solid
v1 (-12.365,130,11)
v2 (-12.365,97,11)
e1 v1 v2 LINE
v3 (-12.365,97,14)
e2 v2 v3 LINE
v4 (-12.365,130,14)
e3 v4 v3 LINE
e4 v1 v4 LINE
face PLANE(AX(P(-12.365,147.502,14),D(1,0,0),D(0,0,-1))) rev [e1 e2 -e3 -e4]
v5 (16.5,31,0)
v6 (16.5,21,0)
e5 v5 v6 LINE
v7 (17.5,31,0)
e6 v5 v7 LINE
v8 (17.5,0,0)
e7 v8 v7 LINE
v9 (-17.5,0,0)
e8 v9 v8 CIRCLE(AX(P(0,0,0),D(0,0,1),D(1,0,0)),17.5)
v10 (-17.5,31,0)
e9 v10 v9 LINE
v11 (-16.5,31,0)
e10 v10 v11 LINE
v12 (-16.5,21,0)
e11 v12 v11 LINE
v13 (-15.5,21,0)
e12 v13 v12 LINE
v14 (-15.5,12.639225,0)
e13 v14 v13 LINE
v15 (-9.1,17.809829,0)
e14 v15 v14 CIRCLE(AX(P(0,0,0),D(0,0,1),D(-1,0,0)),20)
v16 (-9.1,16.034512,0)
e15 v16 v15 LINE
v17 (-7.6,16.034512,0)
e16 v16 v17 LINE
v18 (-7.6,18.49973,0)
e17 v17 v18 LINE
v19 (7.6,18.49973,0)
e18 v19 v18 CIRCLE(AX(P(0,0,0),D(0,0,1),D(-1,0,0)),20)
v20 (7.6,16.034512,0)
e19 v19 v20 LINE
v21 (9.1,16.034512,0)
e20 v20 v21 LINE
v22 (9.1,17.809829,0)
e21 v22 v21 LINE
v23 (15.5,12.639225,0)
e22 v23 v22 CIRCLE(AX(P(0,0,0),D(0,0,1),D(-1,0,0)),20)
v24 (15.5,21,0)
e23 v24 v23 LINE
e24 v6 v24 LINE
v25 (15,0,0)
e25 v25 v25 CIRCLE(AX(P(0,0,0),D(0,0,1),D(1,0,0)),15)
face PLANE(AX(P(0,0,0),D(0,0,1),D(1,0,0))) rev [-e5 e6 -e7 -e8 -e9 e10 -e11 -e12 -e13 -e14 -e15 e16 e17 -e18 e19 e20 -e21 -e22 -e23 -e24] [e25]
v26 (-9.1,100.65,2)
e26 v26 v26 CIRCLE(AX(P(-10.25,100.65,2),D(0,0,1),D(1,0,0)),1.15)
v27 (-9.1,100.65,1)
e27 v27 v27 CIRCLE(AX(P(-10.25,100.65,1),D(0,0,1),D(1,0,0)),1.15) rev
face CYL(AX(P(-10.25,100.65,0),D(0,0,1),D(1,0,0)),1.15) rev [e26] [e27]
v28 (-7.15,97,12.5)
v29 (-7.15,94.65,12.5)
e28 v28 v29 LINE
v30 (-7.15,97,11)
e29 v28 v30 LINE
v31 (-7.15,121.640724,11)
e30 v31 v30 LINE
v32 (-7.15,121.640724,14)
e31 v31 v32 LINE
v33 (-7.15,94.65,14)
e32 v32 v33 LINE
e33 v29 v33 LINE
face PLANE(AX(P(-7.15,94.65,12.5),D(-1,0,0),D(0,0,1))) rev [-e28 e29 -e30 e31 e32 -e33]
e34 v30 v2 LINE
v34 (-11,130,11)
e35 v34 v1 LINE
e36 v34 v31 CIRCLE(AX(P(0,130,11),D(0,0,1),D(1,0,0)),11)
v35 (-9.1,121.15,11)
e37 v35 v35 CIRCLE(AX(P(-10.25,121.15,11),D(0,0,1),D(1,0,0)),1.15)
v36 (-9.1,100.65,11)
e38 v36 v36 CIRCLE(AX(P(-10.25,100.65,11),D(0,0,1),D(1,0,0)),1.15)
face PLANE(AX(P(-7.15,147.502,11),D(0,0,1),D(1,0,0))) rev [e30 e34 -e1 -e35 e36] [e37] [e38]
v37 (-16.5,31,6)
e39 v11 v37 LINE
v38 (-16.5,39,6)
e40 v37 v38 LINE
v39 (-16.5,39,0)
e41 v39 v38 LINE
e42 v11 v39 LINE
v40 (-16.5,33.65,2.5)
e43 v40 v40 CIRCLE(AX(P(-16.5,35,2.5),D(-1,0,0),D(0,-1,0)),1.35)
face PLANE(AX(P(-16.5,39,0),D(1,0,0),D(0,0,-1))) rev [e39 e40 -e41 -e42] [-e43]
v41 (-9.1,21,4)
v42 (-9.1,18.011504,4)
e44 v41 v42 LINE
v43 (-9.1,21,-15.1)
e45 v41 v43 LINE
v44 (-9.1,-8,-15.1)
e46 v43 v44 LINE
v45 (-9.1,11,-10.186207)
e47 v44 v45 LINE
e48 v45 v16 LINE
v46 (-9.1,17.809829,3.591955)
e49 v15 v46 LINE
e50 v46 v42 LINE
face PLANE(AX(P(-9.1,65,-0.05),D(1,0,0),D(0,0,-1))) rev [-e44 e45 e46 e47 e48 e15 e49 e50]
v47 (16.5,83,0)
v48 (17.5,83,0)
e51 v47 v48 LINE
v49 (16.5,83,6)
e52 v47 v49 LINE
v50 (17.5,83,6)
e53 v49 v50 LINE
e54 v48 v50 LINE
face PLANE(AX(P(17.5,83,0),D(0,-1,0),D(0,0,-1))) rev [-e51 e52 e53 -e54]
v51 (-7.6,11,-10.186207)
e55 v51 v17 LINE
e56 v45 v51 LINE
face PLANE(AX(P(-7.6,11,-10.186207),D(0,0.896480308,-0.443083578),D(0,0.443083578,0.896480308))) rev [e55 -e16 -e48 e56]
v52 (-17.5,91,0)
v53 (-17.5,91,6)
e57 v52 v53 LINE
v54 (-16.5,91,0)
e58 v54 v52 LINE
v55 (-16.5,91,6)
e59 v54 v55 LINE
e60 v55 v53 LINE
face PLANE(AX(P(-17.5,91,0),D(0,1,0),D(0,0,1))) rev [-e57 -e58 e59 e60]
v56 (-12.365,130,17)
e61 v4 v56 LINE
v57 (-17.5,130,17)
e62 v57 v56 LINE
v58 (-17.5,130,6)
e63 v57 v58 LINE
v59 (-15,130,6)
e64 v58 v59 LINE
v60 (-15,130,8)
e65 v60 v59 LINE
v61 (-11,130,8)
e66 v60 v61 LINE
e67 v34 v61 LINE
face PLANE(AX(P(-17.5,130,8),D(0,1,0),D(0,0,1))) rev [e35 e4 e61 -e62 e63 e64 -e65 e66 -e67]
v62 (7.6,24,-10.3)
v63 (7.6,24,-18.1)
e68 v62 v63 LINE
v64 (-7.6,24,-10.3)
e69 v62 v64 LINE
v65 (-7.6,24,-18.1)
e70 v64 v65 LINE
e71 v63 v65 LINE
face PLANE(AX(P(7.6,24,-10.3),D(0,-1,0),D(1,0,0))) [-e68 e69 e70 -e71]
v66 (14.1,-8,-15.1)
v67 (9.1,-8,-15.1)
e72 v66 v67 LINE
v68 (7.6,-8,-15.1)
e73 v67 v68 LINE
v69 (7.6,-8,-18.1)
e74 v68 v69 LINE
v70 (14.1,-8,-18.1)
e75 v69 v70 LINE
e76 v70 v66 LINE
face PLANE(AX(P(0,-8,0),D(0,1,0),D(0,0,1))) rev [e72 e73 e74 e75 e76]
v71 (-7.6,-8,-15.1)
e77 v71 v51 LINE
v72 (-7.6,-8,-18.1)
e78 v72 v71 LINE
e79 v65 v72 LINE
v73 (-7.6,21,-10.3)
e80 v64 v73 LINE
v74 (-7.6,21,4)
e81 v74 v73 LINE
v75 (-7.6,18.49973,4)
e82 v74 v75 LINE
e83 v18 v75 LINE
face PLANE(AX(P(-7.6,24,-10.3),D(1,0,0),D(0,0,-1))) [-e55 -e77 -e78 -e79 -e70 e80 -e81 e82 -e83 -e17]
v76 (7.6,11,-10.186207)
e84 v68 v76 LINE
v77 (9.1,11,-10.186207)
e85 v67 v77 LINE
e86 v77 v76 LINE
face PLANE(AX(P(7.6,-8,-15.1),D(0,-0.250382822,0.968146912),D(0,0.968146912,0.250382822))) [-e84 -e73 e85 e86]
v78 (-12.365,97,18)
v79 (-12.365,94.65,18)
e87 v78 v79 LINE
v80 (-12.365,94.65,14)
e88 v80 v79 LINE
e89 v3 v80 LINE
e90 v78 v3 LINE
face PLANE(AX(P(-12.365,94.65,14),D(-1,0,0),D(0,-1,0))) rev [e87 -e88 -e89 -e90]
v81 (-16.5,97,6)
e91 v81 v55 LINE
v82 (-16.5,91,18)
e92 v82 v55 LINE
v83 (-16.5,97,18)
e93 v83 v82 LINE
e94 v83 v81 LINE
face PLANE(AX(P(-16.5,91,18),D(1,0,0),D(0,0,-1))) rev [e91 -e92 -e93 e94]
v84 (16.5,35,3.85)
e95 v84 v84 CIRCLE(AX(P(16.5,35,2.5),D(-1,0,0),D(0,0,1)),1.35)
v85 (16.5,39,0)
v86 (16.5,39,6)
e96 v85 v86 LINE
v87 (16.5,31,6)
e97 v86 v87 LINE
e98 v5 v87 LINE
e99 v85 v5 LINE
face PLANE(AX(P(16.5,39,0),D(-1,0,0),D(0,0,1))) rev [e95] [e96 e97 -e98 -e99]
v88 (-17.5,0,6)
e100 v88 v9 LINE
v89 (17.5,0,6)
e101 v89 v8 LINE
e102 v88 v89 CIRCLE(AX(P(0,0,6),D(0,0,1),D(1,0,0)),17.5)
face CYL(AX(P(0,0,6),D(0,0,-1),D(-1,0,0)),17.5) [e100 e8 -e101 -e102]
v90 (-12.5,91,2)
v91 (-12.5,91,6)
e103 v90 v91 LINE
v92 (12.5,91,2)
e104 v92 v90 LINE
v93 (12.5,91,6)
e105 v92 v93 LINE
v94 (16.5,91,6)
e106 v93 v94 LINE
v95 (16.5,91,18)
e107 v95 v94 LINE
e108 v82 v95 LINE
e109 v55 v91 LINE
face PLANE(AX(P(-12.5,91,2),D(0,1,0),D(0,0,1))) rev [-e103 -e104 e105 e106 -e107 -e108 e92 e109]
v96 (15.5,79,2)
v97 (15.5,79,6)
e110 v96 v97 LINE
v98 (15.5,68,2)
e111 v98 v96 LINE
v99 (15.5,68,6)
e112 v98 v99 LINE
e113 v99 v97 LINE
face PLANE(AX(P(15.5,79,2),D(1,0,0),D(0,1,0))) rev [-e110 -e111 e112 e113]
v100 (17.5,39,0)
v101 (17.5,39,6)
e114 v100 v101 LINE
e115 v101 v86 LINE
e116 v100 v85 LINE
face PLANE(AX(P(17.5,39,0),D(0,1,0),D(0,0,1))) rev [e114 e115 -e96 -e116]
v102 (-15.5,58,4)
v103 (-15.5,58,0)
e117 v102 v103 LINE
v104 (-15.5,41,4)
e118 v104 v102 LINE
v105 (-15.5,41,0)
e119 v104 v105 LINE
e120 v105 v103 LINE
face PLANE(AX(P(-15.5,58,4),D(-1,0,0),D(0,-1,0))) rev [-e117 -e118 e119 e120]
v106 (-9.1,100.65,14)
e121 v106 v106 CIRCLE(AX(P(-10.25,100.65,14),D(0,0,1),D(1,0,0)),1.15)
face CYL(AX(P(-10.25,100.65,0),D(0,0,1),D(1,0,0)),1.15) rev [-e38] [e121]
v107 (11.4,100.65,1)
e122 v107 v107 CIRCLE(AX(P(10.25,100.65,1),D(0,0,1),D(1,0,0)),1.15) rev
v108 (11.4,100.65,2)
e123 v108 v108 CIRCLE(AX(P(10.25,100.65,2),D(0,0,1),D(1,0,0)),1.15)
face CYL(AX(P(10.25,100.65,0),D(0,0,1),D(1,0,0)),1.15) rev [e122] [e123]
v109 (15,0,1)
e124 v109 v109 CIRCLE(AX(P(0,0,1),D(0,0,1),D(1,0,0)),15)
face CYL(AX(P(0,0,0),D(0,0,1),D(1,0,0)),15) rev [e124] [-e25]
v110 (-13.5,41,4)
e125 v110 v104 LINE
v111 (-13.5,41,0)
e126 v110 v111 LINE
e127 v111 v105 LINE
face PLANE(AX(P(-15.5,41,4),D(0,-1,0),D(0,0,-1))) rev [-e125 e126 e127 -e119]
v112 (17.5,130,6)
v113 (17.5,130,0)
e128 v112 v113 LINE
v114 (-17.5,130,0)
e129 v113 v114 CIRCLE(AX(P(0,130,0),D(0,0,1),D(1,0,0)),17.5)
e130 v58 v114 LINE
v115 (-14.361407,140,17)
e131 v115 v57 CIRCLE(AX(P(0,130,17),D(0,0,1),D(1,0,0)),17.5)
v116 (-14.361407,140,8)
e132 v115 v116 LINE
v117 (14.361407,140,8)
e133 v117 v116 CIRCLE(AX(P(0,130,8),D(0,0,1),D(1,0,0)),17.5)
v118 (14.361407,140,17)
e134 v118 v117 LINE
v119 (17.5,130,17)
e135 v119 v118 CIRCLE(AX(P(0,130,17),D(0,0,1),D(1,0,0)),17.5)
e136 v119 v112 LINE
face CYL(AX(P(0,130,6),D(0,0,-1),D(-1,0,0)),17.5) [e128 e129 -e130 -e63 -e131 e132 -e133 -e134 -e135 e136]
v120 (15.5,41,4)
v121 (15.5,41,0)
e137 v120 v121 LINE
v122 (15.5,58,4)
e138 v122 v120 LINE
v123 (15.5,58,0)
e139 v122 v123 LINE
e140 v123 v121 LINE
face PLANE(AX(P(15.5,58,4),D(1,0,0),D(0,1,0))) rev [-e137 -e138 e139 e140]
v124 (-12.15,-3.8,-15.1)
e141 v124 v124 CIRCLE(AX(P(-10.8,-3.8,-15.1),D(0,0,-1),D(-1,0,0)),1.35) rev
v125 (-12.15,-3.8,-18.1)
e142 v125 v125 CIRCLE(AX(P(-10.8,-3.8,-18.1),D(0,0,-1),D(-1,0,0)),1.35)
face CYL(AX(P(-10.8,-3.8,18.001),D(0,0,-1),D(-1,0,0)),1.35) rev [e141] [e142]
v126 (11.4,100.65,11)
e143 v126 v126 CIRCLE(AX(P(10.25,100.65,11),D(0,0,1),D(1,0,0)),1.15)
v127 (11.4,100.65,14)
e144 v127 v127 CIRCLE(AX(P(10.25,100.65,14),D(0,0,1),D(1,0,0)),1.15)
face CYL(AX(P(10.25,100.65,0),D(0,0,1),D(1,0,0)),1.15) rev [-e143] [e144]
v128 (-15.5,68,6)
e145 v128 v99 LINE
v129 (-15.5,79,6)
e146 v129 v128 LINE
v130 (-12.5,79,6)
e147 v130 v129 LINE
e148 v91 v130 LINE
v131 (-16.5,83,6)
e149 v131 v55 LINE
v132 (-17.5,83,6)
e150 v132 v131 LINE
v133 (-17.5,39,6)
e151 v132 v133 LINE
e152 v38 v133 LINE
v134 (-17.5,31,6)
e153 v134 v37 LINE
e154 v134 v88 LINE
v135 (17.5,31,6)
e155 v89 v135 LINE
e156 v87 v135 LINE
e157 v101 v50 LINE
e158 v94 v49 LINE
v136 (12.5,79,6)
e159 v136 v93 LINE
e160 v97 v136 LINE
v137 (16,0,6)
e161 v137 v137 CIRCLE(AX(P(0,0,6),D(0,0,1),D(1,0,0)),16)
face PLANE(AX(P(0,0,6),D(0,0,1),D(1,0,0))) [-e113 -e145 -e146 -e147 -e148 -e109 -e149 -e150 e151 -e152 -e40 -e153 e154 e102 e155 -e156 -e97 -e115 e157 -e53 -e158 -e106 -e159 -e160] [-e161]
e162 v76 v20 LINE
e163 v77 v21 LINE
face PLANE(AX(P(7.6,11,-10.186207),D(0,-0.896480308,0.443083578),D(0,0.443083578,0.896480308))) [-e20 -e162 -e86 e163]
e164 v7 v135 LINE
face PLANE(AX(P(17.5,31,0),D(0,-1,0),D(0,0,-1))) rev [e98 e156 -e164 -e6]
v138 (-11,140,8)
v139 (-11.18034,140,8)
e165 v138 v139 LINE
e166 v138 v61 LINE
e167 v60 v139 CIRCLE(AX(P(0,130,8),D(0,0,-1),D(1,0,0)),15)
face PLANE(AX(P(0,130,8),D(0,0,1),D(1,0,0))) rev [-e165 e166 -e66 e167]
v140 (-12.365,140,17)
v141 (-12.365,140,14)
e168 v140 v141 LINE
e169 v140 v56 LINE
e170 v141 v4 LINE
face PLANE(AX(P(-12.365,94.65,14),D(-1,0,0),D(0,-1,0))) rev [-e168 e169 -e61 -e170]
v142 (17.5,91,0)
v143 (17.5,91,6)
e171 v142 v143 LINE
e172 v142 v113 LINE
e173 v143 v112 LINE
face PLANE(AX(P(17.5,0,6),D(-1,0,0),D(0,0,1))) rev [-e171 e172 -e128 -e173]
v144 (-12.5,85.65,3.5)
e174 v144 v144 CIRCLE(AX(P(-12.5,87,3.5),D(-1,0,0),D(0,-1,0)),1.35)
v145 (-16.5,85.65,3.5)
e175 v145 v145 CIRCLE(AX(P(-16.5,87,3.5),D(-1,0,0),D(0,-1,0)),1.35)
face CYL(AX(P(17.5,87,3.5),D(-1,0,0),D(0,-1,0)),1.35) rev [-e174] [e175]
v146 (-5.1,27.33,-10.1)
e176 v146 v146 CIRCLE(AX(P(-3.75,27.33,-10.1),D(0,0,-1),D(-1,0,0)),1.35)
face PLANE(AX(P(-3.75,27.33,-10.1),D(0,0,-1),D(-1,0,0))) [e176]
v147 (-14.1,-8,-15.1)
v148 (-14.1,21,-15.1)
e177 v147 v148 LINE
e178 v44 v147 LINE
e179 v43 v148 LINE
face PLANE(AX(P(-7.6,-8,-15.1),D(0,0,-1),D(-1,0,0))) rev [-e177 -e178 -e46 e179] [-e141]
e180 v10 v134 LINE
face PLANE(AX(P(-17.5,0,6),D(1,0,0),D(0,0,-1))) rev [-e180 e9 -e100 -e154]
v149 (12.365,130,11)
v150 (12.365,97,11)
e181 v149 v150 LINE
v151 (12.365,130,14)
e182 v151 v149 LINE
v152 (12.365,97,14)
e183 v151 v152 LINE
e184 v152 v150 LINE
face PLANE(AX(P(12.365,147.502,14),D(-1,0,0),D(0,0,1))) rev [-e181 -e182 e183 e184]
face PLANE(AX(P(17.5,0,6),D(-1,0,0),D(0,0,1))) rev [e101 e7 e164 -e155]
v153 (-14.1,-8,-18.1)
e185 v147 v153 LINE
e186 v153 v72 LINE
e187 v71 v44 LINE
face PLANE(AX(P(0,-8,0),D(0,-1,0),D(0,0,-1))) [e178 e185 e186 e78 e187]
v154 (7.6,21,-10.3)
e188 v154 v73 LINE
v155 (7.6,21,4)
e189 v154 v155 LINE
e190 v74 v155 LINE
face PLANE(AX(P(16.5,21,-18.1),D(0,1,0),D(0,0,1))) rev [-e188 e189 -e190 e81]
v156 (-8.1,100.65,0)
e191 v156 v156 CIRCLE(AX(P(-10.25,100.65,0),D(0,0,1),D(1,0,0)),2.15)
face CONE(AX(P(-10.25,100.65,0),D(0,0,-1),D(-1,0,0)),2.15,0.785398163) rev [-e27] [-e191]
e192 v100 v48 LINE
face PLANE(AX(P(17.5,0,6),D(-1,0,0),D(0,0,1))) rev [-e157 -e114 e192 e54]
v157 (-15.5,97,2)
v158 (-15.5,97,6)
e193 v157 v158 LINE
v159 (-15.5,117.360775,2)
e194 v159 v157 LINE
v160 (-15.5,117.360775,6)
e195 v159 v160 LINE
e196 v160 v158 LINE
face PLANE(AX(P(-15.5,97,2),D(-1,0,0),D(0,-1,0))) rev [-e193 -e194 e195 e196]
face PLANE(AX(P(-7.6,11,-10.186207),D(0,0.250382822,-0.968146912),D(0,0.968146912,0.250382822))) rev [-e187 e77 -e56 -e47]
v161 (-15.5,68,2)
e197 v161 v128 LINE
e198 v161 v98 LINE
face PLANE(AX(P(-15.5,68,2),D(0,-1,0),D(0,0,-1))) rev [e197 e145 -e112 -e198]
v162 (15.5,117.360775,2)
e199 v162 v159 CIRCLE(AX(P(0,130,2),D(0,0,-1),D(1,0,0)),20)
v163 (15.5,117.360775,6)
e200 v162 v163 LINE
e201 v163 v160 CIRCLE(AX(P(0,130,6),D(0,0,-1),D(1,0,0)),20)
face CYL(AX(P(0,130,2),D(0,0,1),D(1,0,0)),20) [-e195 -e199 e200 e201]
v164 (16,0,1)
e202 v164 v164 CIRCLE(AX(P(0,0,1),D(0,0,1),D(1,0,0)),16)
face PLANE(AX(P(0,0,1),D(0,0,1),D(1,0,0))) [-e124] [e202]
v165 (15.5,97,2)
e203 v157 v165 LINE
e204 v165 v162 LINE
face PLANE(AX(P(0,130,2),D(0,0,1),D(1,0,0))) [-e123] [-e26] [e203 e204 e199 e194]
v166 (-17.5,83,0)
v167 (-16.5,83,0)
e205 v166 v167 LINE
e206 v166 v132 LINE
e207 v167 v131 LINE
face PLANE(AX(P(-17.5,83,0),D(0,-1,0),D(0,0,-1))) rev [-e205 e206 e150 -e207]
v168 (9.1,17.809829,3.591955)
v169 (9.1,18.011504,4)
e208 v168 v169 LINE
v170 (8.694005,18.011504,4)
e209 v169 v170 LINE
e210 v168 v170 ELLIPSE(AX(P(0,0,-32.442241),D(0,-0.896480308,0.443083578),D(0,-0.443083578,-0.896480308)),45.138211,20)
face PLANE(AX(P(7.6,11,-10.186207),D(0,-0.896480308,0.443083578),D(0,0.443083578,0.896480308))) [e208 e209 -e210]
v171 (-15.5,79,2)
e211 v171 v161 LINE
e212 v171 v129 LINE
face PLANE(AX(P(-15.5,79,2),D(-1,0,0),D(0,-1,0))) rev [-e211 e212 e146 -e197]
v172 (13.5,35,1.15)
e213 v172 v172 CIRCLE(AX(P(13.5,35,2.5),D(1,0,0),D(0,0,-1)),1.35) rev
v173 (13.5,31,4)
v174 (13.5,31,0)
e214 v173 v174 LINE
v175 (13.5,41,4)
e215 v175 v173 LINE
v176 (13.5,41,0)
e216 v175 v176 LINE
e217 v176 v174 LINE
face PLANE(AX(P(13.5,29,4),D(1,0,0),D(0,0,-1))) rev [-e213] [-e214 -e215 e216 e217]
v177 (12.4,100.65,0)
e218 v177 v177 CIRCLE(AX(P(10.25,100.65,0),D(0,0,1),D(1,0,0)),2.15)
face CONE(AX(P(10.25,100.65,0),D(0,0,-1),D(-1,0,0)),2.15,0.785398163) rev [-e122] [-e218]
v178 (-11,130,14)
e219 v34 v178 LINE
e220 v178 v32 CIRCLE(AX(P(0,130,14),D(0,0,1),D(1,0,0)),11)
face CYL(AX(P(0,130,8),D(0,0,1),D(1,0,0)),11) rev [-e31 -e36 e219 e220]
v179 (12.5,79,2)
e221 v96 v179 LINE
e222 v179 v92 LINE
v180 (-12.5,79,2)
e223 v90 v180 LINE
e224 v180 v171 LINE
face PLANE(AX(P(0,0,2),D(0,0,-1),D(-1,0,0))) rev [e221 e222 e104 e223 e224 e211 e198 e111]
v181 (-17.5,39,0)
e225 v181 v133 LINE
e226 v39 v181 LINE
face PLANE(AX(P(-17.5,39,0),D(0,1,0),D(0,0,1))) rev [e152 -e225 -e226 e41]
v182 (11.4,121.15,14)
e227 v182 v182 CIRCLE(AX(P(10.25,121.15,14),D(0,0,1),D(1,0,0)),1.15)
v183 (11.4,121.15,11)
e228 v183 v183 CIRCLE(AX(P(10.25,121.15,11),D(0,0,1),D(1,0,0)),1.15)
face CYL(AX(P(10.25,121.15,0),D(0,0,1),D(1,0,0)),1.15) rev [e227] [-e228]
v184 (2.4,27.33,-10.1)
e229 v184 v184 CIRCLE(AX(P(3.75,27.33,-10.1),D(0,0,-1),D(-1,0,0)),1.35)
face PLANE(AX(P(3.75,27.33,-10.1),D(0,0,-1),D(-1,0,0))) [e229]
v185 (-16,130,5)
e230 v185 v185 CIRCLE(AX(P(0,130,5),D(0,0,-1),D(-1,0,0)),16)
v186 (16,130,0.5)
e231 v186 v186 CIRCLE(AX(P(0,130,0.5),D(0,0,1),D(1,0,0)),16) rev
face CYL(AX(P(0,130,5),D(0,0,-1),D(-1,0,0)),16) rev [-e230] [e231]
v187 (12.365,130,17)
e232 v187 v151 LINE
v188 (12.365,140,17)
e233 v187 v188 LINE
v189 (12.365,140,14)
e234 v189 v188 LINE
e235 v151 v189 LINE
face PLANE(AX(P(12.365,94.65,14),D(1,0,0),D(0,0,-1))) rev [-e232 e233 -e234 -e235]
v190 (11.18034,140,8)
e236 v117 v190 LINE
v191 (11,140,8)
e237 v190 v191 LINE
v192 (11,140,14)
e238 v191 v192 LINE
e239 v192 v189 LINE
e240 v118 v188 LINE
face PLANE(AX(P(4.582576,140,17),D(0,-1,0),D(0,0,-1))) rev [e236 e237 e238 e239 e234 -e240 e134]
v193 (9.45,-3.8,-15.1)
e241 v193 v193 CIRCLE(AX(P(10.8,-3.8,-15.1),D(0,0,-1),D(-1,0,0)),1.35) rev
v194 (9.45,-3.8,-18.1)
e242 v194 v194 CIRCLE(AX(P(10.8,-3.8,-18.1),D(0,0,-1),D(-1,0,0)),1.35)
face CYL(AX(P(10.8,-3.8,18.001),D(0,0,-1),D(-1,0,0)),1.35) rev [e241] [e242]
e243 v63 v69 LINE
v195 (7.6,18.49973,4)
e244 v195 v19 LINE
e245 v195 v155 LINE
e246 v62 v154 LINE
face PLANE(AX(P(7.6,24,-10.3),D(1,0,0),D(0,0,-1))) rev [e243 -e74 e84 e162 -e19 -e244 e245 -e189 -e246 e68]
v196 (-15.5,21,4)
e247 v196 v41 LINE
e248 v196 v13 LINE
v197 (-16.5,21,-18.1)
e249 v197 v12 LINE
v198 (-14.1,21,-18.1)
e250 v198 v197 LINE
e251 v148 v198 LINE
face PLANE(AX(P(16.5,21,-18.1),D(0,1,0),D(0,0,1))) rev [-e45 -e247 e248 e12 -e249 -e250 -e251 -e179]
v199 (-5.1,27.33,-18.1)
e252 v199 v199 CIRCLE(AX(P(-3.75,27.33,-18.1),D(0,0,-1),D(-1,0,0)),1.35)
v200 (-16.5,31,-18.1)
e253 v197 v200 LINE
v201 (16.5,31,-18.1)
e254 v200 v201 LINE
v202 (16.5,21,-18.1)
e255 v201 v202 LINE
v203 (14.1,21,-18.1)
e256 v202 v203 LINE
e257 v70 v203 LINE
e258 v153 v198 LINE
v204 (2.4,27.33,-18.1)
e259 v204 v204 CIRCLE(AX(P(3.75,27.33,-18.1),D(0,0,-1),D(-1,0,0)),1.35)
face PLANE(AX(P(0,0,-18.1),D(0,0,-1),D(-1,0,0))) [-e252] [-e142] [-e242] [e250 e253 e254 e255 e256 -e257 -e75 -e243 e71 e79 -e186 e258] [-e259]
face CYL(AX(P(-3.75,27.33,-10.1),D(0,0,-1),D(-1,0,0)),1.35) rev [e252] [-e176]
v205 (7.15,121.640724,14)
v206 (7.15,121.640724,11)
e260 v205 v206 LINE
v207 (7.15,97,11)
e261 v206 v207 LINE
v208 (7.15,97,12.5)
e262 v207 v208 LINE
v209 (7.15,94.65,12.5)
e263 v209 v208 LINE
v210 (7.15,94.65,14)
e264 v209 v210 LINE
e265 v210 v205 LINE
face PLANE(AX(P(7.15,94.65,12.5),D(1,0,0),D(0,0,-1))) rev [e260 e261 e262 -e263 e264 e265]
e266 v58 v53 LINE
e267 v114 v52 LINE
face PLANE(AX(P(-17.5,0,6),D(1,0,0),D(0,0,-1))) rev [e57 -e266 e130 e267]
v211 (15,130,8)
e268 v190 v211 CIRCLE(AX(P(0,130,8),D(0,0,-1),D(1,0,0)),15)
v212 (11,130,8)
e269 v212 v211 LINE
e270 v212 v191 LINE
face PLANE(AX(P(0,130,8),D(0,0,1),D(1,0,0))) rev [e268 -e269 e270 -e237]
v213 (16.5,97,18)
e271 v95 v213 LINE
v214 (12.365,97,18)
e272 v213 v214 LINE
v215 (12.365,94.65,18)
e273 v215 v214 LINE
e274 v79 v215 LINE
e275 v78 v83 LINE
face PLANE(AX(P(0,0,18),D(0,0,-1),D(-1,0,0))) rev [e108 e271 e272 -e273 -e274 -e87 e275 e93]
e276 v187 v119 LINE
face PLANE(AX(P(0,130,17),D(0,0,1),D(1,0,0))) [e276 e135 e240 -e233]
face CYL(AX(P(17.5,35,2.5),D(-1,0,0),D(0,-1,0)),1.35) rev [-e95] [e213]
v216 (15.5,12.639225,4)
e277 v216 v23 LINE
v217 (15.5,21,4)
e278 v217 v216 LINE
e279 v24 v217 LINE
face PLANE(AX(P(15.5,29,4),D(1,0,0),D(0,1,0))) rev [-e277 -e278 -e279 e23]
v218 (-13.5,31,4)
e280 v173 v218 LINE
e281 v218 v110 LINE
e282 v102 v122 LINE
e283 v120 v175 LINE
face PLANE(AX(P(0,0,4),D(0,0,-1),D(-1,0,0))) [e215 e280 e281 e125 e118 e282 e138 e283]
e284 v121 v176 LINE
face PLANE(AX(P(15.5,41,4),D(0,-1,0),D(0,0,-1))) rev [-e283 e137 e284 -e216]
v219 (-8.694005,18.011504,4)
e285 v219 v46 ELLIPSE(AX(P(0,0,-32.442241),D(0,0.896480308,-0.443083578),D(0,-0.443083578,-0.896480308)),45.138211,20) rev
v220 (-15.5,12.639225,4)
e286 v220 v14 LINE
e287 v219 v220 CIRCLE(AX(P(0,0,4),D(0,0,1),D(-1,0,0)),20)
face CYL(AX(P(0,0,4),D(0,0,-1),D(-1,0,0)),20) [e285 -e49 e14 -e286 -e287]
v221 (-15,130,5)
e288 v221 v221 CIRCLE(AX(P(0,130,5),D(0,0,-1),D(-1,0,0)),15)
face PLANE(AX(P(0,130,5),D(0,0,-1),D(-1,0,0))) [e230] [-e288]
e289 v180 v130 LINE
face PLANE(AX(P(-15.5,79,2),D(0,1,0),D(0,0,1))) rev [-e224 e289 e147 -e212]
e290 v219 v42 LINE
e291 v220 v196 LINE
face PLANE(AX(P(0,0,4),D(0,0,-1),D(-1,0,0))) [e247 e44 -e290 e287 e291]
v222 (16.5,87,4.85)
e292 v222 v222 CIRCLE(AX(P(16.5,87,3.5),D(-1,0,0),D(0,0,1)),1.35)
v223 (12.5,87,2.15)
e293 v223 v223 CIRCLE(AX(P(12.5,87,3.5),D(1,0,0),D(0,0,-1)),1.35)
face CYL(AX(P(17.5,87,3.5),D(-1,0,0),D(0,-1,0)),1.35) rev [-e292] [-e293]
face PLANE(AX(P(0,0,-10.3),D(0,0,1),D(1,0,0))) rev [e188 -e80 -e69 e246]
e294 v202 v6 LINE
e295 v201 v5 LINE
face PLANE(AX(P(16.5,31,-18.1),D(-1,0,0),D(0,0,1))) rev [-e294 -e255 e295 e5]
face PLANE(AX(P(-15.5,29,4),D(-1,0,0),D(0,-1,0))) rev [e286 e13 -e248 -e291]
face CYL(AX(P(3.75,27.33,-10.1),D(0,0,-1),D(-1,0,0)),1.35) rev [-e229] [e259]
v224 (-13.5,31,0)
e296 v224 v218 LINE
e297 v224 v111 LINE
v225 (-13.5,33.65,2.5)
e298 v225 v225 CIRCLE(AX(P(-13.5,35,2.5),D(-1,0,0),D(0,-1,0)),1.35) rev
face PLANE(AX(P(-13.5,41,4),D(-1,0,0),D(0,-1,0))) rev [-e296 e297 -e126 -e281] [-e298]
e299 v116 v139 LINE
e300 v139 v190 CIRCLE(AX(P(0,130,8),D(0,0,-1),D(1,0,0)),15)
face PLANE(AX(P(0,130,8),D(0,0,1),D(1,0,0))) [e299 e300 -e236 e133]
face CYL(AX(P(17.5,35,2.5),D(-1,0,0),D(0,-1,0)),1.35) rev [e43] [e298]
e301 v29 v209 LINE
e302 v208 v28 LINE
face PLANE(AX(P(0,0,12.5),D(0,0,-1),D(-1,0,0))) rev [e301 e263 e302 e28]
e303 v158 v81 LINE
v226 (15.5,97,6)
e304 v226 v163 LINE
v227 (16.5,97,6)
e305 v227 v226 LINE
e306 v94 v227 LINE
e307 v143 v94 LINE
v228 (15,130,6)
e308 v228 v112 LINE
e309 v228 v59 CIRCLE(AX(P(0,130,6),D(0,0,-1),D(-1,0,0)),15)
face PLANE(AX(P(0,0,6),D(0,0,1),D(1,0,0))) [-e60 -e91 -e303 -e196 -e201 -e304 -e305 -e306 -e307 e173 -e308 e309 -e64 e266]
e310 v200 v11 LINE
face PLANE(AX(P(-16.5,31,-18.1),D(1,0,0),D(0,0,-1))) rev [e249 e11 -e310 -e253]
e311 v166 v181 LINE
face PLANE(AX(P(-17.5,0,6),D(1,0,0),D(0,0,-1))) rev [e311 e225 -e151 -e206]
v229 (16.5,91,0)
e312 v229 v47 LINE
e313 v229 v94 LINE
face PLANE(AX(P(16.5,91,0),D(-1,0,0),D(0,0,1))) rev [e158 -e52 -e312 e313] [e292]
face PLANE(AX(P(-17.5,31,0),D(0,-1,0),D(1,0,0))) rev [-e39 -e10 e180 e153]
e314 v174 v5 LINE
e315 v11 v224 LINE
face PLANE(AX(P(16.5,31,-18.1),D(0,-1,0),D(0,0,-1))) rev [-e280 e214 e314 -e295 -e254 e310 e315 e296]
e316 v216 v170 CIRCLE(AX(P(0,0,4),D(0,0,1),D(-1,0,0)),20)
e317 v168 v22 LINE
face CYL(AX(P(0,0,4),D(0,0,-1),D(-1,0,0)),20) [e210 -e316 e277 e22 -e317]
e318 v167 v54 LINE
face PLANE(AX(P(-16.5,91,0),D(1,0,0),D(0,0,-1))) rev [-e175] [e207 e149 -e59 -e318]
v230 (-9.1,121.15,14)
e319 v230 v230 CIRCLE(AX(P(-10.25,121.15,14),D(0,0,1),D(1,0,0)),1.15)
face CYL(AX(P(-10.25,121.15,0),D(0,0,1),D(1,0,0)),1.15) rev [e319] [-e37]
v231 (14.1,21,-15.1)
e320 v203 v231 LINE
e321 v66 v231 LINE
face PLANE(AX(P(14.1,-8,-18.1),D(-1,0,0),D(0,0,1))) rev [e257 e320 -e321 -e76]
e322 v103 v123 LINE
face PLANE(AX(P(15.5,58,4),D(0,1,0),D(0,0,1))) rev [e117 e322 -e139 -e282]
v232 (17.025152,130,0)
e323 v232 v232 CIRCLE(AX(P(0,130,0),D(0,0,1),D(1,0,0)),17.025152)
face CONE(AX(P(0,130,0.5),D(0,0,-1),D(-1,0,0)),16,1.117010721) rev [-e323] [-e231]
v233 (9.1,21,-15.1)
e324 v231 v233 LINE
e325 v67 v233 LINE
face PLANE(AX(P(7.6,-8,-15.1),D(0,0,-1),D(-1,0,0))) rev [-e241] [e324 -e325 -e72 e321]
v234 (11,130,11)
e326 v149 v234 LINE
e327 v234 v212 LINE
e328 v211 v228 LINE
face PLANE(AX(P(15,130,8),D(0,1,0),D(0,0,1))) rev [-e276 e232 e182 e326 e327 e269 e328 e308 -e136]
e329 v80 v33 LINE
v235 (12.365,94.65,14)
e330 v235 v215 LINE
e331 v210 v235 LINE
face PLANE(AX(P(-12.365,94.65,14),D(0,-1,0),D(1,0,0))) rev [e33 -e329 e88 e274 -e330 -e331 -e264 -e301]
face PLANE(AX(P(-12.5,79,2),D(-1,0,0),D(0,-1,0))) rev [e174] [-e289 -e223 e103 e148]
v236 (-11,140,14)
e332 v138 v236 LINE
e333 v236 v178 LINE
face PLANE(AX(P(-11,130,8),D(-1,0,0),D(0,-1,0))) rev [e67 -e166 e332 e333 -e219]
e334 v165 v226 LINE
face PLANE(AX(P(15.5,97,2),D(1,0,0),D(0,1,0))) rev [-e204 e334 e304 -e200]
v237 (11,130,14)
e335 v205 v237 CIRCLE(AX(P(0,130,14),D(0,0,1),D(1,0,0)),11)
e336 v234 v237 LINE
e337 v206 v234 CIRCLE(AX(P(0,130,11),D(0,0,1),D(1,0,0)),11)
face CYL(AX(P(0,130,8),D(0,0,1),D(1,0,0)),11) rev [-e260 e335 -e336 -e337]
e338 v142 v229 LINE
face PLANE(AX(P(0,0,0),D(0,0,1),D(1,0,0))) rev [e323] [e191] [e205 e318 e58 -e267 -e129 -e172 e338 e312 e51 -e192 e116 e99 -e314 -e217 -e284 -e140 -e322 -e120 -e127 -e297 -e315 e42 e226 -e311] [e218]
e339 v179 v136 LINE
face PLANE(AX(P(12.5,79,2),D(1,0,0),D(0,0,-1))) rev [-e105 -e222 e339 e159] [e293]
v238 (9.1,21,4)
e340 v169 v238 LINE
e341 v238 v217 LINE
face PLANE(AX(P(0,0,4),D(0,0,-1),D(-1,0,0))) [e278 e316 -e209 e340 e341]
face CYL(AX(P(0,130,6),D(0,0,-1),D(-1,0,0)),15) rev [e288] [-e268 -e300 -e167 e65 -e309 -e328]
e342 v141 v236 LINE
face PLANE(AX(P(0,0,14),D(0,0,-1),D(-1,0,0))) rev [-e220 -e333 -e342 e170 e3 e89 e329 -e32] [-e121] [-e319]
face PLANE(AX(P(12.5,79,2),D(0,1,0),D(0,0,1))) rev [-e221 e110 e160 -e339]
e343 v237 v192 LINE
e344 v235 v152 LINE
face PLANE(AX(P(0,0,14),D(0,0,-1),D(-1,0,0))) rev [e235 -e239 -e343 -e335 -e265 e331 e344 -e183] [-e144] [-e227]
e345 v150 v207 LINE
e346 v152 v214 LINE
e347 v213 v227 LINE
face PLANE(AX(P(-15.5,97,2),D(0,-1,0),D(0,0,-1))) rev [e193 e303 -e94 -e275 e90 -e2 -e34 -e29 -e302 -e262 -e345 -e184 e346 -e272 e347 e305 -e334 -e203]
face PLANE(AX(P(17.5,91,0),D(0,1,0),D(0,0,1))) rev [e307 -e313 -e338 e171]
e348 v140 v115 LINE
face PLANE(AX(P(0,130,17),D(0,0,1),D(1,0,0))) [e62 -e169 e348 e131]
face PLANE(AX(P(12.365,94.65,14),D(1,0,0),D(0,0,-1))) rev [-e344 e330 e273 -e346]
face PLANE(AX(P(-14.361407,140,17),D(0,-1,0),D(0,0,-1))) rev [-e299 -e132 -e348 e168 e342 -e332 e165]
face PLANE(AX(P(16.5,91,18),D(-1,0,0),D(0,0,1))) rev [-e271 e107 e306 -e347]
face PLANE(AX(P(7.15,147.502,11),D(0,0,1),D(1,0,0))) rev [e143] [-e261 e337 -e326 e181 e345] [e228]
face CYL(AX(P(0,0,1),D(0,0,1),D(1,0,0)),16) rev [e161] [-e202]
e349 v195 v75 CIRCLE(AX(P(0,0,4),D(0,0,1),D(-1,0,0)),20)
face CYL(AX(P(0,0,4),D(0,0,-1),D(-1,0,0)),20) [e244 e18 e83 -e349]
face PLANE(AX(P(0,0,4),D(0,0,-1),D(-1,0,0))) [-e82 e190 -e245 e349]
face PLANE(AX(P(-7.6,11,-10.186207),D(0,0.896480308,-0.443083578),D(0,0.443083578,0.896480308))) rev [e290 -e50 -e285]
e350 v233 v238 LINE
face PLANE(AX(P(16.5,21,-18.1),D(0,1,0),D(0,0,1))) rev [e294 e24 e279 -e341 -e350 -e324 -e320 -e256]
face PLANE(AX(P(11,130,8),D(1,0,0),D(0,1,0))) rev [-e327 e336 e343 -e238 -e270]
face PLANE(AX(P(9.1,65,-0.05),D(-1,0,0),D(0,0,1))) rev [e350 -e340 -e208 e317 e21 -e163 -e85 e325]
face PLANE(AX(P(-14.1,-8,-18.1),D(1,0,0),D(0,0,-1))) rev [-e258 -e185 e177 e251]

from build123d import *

# Parameters (mm, degrees)
EXTRUDE_1_DEPTH      = 6
SKETCH_2_R           = 16
CUT_EXTRUDE_1_DEPTH  = 5
CHAMFER_1_SIZE       = 0.5
CHAMFER_1_SIZE2      = 1.025151921
SKETCH_24_R          = 15
CUT_EXTRUDE_15_DEPTH = 149.618639477
CUT_EXTRUDE_16_DEPTH = 4
SKETCH_26_W          = 1
SKETCH_26_H          = 8
CUT_EXTRUDE_17_DEPTH = 149.655642342
SKETCH_27_R          = 1.35
CUT_EXTRUDE_18_DEPTH = 152.486798105
SKETCH_29_W          = 33
SKETCH_29_H          = 6
EXTRUDE_3_DEPTH      = 12
EXTRUDE_4_DEPTH      = 2
EXTRUDE_5_DEPTH      = 9
SKETCH_32_W          = 24.73
SKETCH_32_H          = 50
CUT_EXTRUDE_19_DEPTH = 4
SKETCH_33_W          = 14.3
SKETCH_33_H          = 2.35
CUT_EXTRUDE_20_DEPTH = 1.5
EXTRUDE_6_REACH      = 119.22
SKETCH_34_W          = 5.215
SKETCH_34_H          = 3
CUT_EXTRUDE_START    = -6
CUT_EXTRUDE_21_DEPTH = 6
SKETCH_36_R          = 1.15
CUT_EXTRUDE_22_DEPTH = 150.192828246
SKETCH_37_R          = 16
CUT_EXTRUDE_23_DEPTH = 5
SKETCH_38_R          = 15
CUT_EXTRUDE_24_DEPTH = 150.504180544
CUT_EXTRUDE_25_DEPTH = 4
SKETCH_40_W          = 33
SKETCH_40_H          = 10
EXTRUDE_7_DEPTH      = 22.1
SKETCH_41_W          = 15.2
SKETCH_41_H          = 3
CUT_EXTRUDE_26_DEPTH = 7.8
SKETCH_42_R          = 1.35
CUT_EXTRUDE_27_DEPTH = 8
SKETCH_43_W          = 6.5
SKETCH_43_H          = 3
EXTRUDE_8_DEPTH      = 29
CUT_EXTRUDE_28_REACH = 154.858
SKETCH_48_R          = 1.35
RIB_START            = -1.5
RIB_17_DEPTH         = 1.5
RIB_20_DEPTH         = 1.5
CHAMFER_2_SIZE       = 1


# Read off the part's stored shape, not the designer's step: 보강대17, 보강대20
with BuildPart() as part:
    # 스케치1 → 보스-돌출1 (new body)
    with BuildSketch(Plane.XY):
        with BuildLine():
            Line((-17.5, 0), (-17.5, 130))
            ThreePointArc((-17.5, 130), (0, 147.5), (17.5, 130))
            Line((17.5, 130), (17.5, 0))
            ThreePointArc((17.5, 0), (0, -17.5), (-17.5, 0))
        make_face()
    extrude(amount=EXTRUDE_1_DEPTH)

    # 스케치2 → 컷-돌출1 (cut)
    with BuildSketch(Plane(origin=(0, 0, 0), x_dir=(-1, 0, 0), z_dir=(0, 0, -1))):
        with Locations((0, 130)):
            Circle(SKETCH_2_R)
    extrude(amount=-CUT_EXTRUDE_1_DEPTH, mode=Mode.SUBTRACT)

    # 모따기1
    chamfer_1_edges = [part.edges().sort_by_distance(p)[0] for p in [
        (16, 130, 0),
    ]]
    chamfer_1_side = [part.faces().sort_by_distance(p)[0] for p in [
        (16, 130, 2.5),
    ]]
    chamfer(chamfer_1_edges, length=CHAMFER_1_SIZE, length2=CHAMFER_1_SIZE2, reference=chamfer_1_side[0])

    # 스케치24 → 컷-돌출15 (cut, through all)
    with BuildSketch(Plane(origin=(0, 0, 5), x_dir=(-1, 0, 0), z_dir=(0, 0, -1))):
        with Locations((0, 130)):
            Circle(SKETCH_24_R)
    extrude(amount=-CUT_EXTRUDE_15_DEPTH, mode=Mode.SUBTRACT)

    # 스케치25 → 컷-돌출16 (cut)
    with BuildSketch(Plane.XY.offset(6)):
        with BuildLine():
            Line((-15.5, 97), (15.5, 97))
            Line((15.5, 97), (15.5, 117.36077534))
            ThreePointArc((15.5, 117.36077534), (0, 110), (-15.5, 117.36077534))
            Line((-15.5, 117.36077534), (-15.5, 97))
        make_face()
        Polygon((-15.5, 79), (-12.5, 79), (-12.5, 91), (12.5, 91), (12.5, 79), (15.5, 79), (15.5, 68), (-15.5, 68), align=None)
    extrude(amount=-CUT_EXTRUDE_16_DEPTH, mode=Mode.SUBTRACT)

    # 스케치26 → 컷-돌출17 (cut, through all)
    with BuildSketch(Plane.XY.offset(6)):
        with Locations((-17, 87)):
            Rectangle(SKETCH_26_W, SKETCH_26_H)
        with Locations((17, 87)):
            Rectangle(SKETCH_26_W, SKETCH_26_H)
        with Locations((-17, 35)):
            Rectangle(SKETCH_26_W, SKETCH_26_H)
        with Locations((17, 35)):
            Rectangle(SKETCH_26_W, SKETCH_26_H)
    extrude(amount=-CUT_EXTRUDE_17_DEPTH, mode=Mode.SUBTRACT)

    # 스케치27 → 컷-돌출18 (cut, through all)
    with BuildSketch(Plane.ZY.offset(16.5)):
        with Locations((3.5, 87)):
            Circle(SKETCH_27_R)
        with Locations(Location((2.5, 35, 0), (0, 0, 270))):
            Circle(SKETCH_27_R)
    extrude(amount=-CUT_EXTRUDE_18_DEPTH, mode=Mode.SUBTRACT)

    # 스케치29 → 보스-돌출3 (add)
    with BuildSketch(Plane.XY.offset(6)):
        with Locations((0, 94)):
            Rectangle(SKETCH_29_W, SKETCH_29_H)
    extrude(amount=EXTRUDE_3_DEPTH)

    # 스케치30 → 보스-돌출4 (add)
    with BuildSketch(Plane.XY.offset(6)):
        with BuildLine():
            Line((-17.5, 130), (-15, 130))
            ThreePointArc((-15, 130), (0, 145), (15, 130))
            Line((15, 130), (17.5, 130))
            ThreePointArc((17.5, 130), (0, 147.5), (-17.5, 130))
        make_face()
    extrude(amount=EXTRUDE_4_DEPTH)

    # 스케치31 → 보스-돌출5 (add)
    with BuildSketch(Plane.XY.offset(8)):
        with BuildLine():
            Line((-17.5, 130), (-11, 130))
            ThreePointArc((-11, 130), (-9.257654472, 135.941029682), (-4.582575695, 140))
            Line((-4.582575695, 140), (-14.361406616, 140))
            ThreePointArc((-14.361406616, 140), (-16.696925103, 135.240485866), (-17.5, 130))
        make_face()
        with BuildLine():
            Line((11, 130), (17.5, 130))
            ThreePointArc((17.5, 130), (16.696925103, 135.240485866), (14.361406616, 140))
            Line((14.361406616, 140), (4.582575695, 140))
            ThreePointArc((4.582575695, 140), (9.257654472, 135.941029682), (11, 130))
        make_face()
    extrude(amount=EXTRUDE_5_DEPTH)

    # 스케치32 → 컷-돌출19 (cut)
    with BuildSketch(Plane.XY.offset(18)):
        with Locations((0, 119.65)):
            Rectangle(SKETCH_32_W, SKETCH_32_H)
    extrude(amount=-CUT_EXTRUDE_19_DEPTH, mode=Mode.SUBTRACT)

    # 스케치33 → 컷-돌출20 (cut)
    with BuildSketch(Plane.XY.offset(14)):
        with Locations((0, 95.825)):
            Rectangle(SKETCH_33_W, SKETCH_33_H)
    extrude(amount=-CUT_EXTRUDE_20_DEPTH, mode=Mode.SUBTRACT)

    # 스케치34 → 보스-돌출6 (add, up to next)
    with BuildSketch(Plane(origin=(0, 97, 0), x_dir=(1, 0, 0), z_dir=(0, 1, 0)), mode=Mode.PRIVATE) as extrude_6_sk1:
        with Locations((-9.7575, -12.5)):
            Rectangle(SKETCH_34_W, SKETCH_34_H)
    extrude_6_tool1 = extrude(extrude_6_sk1.sketch, amount=EXTRUDE_6_REACH, mode=Mode.PRIVATE) - part.part
    # 스케치34 → 보스-돌출6 (add, up to next)
    with BuildSketch(Plane(origin=(0, 97, 0), x_dir=(1, 0, 0), z_dir=(0, 1, 0)), mode=Mode.PRIVATE) as extrude_6_sk2:
        with Locations((9.7575, -12.5)):
            Rectangle(SKETCH_34_W, SKETCH_34_H)
    extrude_6_tool2 = extrude(extrude_6_sk2.sketch, amount=EXTRUDE_6_REACH, mode=Mode.PRIVATE) - part.part
    add(extrude_6_tool1.solids().sort_by_distance((-9.7575, 97, 12.5))[0])
    add(extrude_6_tool2.solids().sort_by_distance((9.7575, 97, 12.5))[0])

    # 스케치35 → 컷-돌출21 (cut)
    with BuildSketch(Plane.XY.offset(14).offset(CUT_EXTRUDE_START)):
        with BuildLine():
            Line((-11, 130), (-11, 140))
            Line((-11, 140), (11, 140))
            Line((11, 140), (11, 130))
            ThreePointArc((11, 130), (0, 119), (-11, 130))
        make_face()
    extrude(amount=CUT_EXTRUDE_21_DEPTH, mode=Mode.SUBTRACT)

    # 스케치36 → 컷-돌출22 (cut, through all)
    with BuildSketch(Plane.XY.offset(14)):
        with Locations((-10.25, 121.15)):
            Circle(SKETCH_36_R)
        with Locations((10.25, 121.15)):
            Circle(SKETCH_36_R)
        with Locations((-10.25, 100.65)):
            Circle(SKETCH_36_R)
        with Locations((10.25, 100.65)):
            Circle(SKETCH_36_R)
    extrude(amount=-CUT_EXTRUDE_22_DEPTH, mode=Mode.SUBTRACT)

    # 스케치37 → 컷-돌출23 (cut)
    with BuildSketch(Plane.XY.offset(6)):
        Circle(SKETCH_37_R)
    extrude(amount=-CUT_EXTRUDE_23_DEPTH, mode=Mode.SUBTRACT)

    # 스케치38 → 컷-돌출24 (cut, through all)
    with BuildSketch(Plane.XY.offset(1)):
        Circle(SKETCH_38_R)
    extrude(amount=-CUT_EXTRUDE_24_DEPTH, mode=Mode.SUBTRACT)

    # 스케치39 → 컷-돌출25 (cut)
    with BuildSketch(Plane(origin=(0, 0, 0), x_dir=(-1, 0, 0), z_dir=(0, 0, -1))):
        with BuildLine():
            Line((-15.5, 58), (-15.5, 41))
            Line((-15.5, 41), (-13.5, 41))
            Line((-13.5, 41), (-13.5, 29))
            Line((-13.5, 29), (-15.5, 29))
            Line((-15.5, 29), (-15.5, 12.63922466))
            ThreePointArc((-15.5, 12.63922466), (0, 20), (15.5, 12.63922466))
            Line((15.5, 12.63922466), (15.5, 29))
            Line((15.5, 29), (13.5, 29))
            Line((13.5, 29), (13.5, 41))
            Line((13.5, 41), (15.5, 41))
            Line((15.5, 41), (15.5, 58))
            Line((15.5, 58), (-15.5, 58))
        make_face()
    extrude(amount=-CUT_EXTRUDE_25_DEPTH, mode=Mode.SUBTRACT)

    # 스케치40 → 보스-돌출7 (add)
    with BuildSketch(Plane(origin=(0, 0, 4), x_dir=(-1, 0, 0), z_dir=(0, 0, -1))):
        with Locations((0, 26)):
            Rectangle(SKETCH_40_W, SKETCH_40_H)
    extrude(amount=EXTRUDE_7_DEPTH)

    # 스케치41 → 컷-돌출26 (cut)
    with BuildSketch(Plane(origin=(0, 0, -18.1), x_dir=(-1, 0, 0), z_dir=(0, 0, -1))):
        with Locations((0, 22.5)):
            Rectangle(SKETCH_41_W, SKETCH_41_H)
    extrude(amount=-CUT_EXTRUDE_26_DEPTH, mode=Mode.SUBTRACT)

    # 스케치42 → 컷-돌출27 (cut)
    with BuildSketch(Plane(origin=(0, 0, -18.1), x_dir=(-1, 0, 0), z_dir=(0, 0, -1))):
        with Locations((-3.75, 27.33)):
            Circle(SKETCH_42_R)
        with Locations((3.75, 27.33)):
            Circle(SKETCH_42_R)
    extrude(amount=-CUT_EXTRUDE_27_DEPTH, mode=Mode.SUBTRACT)

    # 스케치43 → 보스-돌출8 (add)
    with BuildSketch(Plane.XZ.offset(-21)):
        with Locations((-10.85, -16.6)):
            Rectangle(SKETCH_43_W, SKETCH_43_H)
        with Locations((10.85, -16.6)):
            Rectangle(SKETCH_43_W, SKETCH_43_H)
    extrude(amount=EXTRUDE_8_DEPTH)

    # 스케치48 → 컷-돌출28 (cut, up to next)
    with BuildSketch(Plane(origin=(0, 0, -18.1), x_dir=(-1, 0, 0), z_dir=(0, 0, -1)), mode=Mode.PRIVATE) as cut_extrude_28_sk1:
        with Locations((10.8, -3.8)):
            Circle(SKETCH_48_R)
    cut_extrude_28_tool1 = extrude(cut_extrude_28_sk1.sketch, amount=-CUT_EXTRUDE_28_REACH, mode=Mode.PRIVATE) & part.part
    # 스케치48 → 컷-돌출28 (cut, up to next)
    with BuildSketch(Plane(origin=(0, 0, -18.1), x_dir=(-1, 0, 0), z_dir=(0, 0, -1)), mode=Mode.PRIVATE) as cut_extrude_28_sk2:
        with Locations((-10.8, -3.8)):
            Circle(SKETCH_48_R)
    cut_extrude_28_tool2 = extrude(cut_extrude_28_sk2.sketch, amount=-CUT_EXTRUDE_28_REACH, mode=Mode.PRIVATE) & part.part
    add(cut_extrude_28_tool1.solids().sort_by_distance((-10.8, -3.8, -18.1))[0], mode=Mode.SUBTRACT)
    add(cut_extrude_28_tool2.solids().sort_by_distance((10.8, -3.8, -18.1))[0], mode=Mode.SUBTRACT)

    # 보강대17 outline → 보강대17 (add)
    with BuildSketch(Plane(origin=(-7.6, 0, 0), x_dir=(0, 0, -1), z_dir=(1, 0, 0)).offset(RIB_START)):
        Polygon((15.1, -8), (15.1, 22), (-6, 22), (-6, 19.000000001), (-4, 18.011504048), (-3.591955232, 17.809828747), (0, 16.034512143), (10.186206897, 11), align=None)
    extrude(amount=RIB_17_DEPTH)

    # 보강대20 outline → 보강대20 (add)
    with BuildSketch(Plane.ZY.offset(-7.6).offset(RIB_START)):
        Polygon((-15.1, -8), (-10.186206897, 11), (0, 16.034512143), (3.591955232, 17.809828747), (4, 18.011504048), (4, 22), (-15.1, 22), align=None)
    extrude(amount=RIB_20_DEPTH)

    # 모따기2
    chamfer_2_edges = [part.edges().sort_by_distance(p)[0] for p in [
        (-11.4, 100.65, 0),
        (9.1, 100.65, 0),
    ]]
    chamfer(chamfer_2_edges, length=CHAMFER_2_SIZE)


solid = part.part
